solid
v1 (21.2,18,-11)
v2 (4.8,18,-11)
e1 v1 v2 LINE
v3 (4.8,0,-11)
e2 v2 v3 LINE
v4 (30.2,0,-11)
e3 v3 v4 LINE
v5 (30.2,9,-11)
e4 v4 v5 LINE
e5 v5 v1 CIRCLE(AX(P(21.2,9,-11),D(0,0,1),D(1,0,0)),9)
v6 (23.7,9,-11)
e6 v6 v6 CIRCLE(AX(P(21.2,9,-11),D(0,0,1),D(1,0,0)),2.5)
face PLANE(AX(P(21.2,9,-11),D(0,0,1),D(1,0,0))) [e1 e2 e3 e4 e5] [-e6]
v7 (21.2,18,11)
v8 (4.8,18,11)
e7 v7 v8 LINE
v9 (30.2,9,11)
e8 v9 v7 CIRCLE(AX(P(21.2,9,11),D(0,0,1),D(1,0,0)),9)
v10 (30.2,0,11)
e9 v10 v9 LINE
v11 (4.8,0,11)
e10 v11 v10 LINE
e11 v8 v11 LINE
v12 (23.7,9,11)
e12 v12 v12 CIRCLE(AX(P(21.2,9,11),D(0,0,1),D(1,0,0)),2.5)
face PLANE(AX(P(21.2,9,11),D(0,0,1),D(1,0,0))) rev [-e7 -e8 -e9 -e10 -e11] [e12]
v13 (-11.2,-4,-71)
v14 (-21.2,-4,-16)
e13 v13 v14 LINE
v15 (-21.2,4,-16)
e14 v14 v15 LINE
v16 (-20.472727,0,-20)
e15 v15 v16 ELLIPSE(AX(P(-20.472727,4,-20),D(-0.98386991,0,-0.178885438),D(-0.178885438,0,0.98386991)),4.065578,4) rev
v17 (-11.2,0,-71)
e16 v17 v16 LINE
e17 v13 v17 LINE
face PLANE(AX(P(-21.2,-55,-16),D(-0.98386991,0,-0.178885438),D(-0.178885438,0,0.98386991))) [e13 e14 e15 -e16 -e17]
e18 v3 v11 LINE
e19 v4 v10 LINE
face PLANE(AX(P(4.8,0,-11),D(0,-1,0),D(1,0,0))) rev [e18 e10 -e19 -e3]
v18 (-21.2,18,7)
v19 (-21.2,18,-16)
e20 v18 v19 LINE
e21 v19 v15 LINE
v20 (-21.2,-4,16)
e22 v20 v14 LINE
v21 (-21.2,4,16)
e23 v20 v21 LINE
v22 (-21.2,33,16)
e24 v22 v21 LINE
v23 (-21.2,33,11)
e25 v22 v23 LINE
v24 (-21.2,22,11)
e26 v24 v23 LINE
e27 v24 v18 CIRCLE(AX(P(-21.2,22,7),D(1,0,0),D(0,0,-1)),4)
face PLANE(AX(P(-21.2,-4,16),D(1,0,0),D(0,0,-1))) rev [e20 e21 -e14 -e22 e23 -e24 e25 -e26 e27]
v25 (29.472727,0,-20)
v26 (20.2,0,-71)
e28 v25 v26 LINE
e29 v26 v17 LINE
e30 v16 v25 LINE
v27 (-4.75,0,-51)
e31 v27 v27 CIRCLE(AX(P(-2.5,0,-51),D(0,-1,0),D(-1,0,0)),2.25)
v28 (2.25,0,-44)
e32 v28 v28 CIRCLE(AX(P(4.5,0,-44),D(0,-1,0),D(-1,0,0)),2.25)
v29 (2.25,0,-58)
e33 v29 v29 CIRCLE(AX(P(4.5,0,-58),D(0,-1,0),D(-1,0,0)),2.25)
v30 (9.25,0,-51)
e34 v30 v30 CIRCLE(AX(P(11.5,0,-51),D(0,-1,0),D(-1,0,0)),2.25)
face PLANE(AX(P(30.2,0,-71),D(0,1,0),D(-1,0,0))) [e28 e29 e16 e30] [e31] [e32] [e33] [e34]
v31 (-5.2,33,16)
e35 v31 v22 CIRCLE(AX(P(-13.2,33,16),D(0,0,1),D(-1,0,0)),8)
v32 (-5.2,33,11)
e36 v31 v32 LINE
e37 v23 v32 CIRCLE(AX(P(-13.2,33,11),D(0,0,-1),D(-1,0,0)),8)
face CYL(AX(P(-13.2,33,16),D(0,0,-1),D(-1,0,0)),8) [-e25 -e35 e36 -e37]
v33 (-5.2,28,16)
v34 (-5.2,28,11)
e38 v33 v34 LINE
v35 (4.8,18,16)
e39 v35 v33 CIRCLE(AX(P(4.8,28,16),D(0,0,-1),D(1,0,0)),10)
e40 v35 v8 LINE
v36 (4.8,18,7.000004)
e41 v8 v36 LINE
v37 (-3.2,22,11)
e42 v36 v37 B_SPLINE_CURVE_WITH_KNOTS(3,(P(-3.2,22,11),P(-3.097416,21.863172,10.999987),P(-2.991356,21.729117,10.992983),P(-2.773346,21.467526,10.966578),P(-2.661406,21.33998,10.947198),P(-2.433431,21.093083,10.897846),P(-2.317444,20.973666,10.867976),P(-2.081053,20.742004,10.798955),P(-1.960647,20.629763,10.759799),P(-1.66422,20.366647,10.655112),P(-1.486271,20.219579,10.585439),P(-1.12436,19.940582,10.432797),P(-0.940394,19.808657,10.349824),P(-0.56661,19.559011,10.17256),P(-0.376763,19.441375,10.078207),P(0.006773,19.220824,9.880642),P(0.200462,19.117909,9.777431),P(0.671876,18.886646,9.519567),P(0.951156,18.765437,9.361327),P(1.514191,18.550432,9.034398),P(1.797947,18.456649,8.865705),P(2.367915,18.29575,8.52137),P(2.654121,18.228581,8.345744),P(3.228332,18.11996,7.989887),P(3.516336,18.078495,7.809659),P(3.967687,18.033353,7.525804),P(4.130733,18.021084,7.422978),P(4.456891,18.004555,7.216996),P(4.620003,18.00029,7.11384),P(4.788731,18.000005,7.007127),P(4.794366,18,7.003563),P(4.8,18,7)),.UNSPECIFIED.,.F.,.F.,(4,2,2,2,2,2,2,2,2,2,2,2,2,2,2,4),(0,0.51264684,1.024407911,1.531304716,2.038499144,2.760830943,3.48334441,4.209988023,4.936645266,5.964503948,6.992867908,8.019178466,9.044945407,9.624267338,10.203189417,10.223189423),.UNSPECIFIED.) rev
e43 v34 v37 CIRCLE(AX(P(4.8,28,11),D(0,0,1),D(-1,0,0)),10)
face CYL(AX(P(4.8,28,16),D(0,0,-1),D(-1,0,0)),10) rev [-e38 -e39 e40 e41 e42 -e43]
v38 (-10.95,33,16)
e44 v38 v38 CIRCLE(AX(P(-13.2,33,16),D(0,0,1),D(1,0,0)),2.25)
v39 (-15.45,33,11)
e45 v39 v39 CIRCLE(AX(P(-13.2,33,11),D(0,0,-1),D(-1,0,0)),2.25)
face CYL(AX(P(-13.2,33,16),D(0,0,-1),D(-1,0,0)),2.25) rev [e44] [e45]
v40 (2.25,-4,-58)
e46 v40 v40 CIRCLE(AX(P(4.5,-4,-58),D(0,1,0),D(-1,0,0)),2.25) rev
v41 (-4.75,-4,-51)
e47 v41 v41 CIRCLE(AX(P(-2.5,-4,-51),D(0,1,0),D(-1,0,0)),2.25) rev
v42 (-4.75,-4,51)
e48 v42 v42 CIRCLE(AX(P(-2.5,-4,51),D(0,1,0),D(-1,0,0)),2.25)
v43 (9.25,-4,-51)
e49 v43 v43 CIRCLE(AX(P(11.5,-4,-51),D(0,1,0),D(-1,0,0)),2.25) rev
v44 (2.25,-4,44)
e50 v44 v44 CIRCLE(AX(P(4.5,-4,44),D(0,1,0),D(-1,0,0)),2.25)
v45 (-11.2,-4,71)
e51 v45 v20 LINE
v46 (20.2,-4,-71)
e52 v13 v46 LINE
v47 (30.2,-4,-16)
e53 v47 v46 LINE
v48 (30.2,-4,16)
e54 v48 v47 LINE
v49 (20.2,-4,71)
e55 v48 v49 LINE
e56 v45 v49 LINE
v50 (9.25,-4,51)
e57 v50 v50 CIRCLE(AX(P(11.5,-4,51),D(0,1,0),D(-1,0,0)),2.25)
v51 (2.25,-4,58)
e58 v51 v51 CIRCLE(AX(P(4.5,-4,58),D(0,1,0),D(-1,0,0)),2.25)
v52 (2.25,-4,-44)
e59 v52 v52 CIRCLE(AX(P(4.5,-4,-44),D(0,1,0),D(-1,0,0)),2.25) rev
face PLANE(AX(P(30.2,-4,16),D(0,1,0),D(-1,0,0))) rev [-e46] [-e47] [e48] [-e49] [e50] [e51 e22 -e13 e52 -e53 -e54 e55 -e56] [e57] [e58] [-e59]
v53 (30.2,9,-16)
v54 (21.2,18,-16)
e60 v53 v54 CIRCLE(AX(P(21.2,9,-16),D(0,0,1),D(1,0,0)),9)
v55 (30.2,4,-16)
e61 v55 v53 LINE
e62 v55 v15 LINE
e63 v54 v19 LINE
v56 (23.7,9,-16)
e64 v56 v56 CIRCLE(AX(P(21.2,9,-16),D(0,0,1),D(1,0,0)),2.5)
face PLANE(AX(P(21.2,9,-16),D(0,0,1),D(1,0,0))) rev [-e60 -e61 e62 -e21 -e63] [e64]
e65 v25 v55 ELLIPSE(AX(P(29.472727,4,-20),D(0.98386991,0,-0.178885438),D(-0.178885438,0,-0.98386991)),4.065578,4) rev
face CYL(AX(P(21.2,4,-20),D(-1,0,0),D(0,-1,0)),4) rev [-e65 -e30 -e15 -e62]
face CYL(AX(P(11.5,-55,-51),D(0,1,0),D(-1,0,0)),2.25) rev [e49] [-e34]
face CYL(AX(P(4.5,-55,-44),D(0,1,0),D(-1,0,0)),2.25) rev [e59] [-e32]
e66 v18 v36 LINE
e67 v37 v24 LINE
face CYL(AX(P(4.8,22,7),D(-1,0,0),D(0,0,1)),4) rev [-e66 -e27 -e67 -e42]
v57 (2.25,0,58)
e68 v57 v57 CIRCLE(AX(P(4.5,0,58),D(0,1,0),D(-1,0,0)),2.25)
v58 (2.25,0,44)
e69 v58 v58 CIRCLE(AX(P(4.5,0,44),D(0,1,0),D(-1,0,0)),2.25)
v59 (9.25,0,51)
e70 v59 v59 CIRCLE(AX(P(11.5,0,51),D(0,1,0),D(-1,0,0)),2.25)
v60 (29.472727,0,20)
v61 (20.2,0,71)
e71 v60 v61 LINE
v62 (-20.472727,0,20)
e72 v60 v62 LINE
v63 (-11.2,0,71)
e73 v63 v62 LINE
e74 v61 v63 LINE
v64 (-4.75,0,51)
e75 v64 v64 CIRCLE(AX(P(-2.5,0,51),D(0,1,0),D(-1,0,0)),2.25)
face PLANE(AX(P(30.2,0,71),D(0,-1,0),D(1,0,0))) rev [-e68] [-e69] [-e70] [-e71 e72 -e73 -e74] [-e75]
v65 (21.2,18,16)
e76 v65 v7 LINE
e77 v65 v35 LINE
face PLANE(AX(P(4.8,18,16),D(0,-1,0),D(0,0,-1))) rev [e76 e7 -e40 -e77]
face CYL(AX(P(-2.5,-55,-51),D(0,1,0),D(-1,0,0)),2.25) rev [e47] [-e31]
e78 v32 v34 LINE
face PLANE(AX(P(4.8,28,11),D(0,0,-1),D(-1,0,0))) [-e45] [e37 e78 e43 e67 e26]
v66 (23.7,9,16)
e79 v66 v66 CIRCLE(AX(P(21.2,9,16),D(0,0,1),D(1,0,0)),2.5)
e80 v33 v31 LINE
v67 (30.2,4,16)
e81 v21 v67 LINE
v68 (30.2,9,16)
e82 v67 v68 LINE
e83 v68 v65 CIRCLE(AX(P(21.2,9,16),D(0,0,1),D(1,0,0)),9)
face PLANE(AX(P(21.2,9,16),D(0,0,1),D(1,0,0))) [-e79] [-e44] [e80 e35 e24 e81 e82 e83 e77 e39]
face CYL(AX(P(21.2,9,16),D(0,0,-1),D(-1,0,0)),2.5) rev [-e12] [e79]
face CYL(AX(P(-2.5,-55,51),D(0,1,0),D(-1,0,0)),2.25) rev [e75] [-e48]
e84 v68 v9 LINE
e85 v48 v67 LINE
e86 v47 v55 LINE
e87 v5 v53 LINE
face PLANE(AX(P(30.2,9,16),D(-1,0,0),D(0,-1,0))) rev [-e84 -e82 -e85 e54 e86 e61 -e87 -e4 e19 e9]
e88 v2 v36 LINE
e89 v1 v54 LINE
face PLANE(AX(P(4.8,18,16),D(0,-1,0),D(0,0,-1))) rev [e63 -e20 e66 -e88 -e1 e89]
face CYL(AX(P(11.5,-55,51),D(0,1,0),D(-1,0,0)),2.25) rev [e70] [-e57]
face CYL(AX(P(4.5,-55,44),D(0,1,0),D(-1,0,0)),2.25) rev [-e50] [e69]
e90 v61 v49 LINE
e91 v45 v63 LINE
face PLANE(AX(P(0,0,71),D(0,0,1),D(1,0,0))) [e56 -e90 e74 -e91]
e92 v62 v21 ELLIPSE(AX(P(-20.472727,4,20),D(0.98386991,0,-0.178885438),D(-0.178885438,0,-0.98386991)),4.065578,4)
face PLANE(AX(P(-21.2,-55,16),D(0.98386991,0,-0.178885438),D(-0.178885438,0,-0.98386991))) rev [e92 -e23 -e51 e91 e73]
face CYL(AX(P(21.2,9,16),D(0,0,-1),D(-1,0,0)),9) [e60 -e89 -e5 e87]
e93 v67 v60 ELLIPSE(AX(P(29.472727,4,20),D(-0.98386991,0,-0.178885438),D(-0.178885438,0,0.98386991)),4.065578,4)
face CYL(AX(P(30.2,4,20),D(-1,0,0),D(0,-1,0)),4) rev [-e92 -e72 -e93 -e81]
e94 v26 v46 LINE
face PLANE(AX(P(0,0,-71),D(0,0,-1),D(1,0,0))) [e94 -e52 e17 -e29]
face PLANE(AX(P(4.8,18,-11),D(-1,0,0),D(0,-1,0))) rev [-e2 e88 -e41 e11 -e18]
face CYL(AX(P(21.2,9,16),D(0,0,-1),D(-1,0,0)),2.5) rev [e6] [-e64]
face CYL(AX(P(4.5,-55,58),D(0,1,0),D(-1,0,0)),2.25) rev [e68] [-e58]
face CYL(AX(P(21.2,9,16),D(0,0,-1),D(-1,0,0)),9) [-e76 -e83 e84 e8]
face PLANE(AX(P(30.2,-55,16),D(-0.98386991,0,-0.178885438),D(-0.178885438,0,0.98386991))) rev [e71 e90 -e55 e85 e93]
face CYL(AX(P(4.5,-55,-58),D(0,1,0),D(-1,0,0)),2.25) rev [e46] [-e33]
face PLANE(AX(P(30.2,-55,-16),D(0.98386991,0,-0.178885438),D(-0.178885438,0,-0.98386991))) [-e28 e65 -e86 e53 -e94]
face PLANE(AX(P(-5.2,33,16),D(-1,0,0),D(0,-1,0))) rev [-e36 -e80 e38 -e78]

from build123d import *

# Parameters (mm, degrees)
SKETCH1_R           = 2.5
SKETCH1_R_2         = 2.25
BOSS_EXTRUDE1_DEPTH = 16
SKETCH_2_W          = 51.4
SKETCH_2_H          = 4
EXTRUDE_1_DEPTH     = 55
SKETCH_3_R          = 2.25
CUT_EXTRUDE_2_DEPTH = 55
CUT_EXTRUDE_3_DEPTH = 11
CUT_EXTRUDE_START   = -27
CUT_EXTRUDE_4_DEPTH = 27
FILLET_1_R          = 4


with BuildPart() as part:
    # Sketch1 → Boss-Extrude1 (new, symmetric)
    with BuildSketch(Plane.XY):
        with BuildLine():
            Line((-21.2, 33), (-21.2, 22))
            Line((-21.2, 22), (-21.2, 0))
            Line((-21.2, 0), (-21.2, -4))
            Line((-21.2, -4), (30.2, -4))
            Line((30.2, -4), (30.2, 9))
            ThreePointArc((30.2, 9), (27.563961031, 15.363961031), (21.2, 18))
            Line((21.2, 18), (4.8, 18))
            ThreePointArc((4.8, 18), (-2.271067812, 20.928932188), (-5.2, 28))
            Line((-5.2, 28), (-5.2, 33))
            ThreePointArc((-5.2, 33), (-13.2, 41), (-21.2, 33))
        make_face()
        with Locations((21.2, 9)):
            Circle(SKETCH1_R, mode=Mode.SUBTRACT)
        with Locations((-13.2, 33)):
            Circle(SKETCH1_R_2, mode=Mode.SUBTRACT)
    extrude(amount=BOSS_EXTRUDE1_DEPTH, both=True)

    # 草图2 → 凸台-拉伸1 (add)
    with BuildSketch(Plane.XY.offset(16)):
        with Locations((4.5, -2)):
            Rectangle(SKETCH_2_W, SKETCH_2_H)
    extrude_1 = extrude(amount=EXTRUDE_1_DEPTH)

    # 草图3 → 切除-拉伸2 (cut)
    with BuildSketch(Plane(origin=(0, 0, 0), x_dir=(1, 0, 0), z_dir=(0, 1, 0))):
        with Locations(Location((11.5, -51, 0), (0, 0, 180))):
            Circle(SKETCH_3_R)
        with Locations(Location((4.5, -44, 0), (0, 0, 180))):
            Circle(SKETCH_3_R)
        with Locations(Location((4.5, -58, 0), (0, 0, 180))):
            Circle(SKETCH_3_R)
        with Locations(Location((-2.5, -51, 0), (0, 0, 180))):
            Circle(SKETCH_3_R)
        Polygon((30.2, -16), (20.2, -71), (30.2, -71), align=None)
        Polygon((-21.2, -16), (-11.2, -71), (-21.2, -71), align=None)
    cut_extrude_2 = extrude(amount=-CUT_EXTRUDE_2_DEPTH, mode=Mode.SUBTRACT)

    # 镜向1: 凸台-拉伸1, 切除-拉伸2 across plane
    add(extrude_1.mirror(Plane.XY))
    add(cut_extrude_2.mirror(Plane.XY), mode=Mode.SUBTRACT)

    # 草图6 → 切除-拉伸3 (cut, symmetric)
    with BuildSketch(Plane.XY):
        with BuildLine():
            Line((4.8, 18), (4.8, 0))
            Line((4.8, 0), (30.2, 0))
            Line((30.2, 0), (30.2, 9))
            ThreePointArc((30.2, 9), (27.563961031, 15.363961031), (21.2, 18))
            Line((21.2, 18), (4.8, 18))
        make_face()
    extrude(amount=CUT_EXTRUDE_3_DEPTH, both=True, mode=Mode.SUBTRACT)

    # 草图7 → 切除-拉伸4 (cut)
    with BuildSketch(Plane(origin=(0, 0, -16), x_dir=(-1, 0, 0), z_dir=(0, 0, -1)).offset(CUT_EXTRUDE_START)):
        with BuildLine():
            Line((-4.8, 18), (21.2, 18))
            Line((21.2, 18), (21.2, 33))
            ThreePointArc((21.2, 33), (13.2, 41), (5.2, 33))
            Line((5.2, 33), (5.2, 28))
            ThreePointArc((5.2, 28), (2.271067812, 20.928932188), (-4.8, 18))
        make_face()
    extrude(amount=CUT_EXTRUDE_4_DEPTH, mode=Mode.SUBTRACT)

    # 圆角1
    # the kernel refuses this fillet: 4 mm, written as the material it adds along each edge
    with BuildSketch(Plane(origin=(-31.2, 0, -16), x_dir=(0, 1, 0), z_dir=(1, 0, 0))) as fillet_1_piece_1_section:
        with BuildLine():
            CenterArc((FILLET_1_R, -FILLET_1_R), FILLET_1_R, 90, 90)
            Line((0, -FILLET_1_R), (0, 0))
            Line((0, 0), (FILLET_1_R, 0))
        make_face()
    fillet_1_piece_1 = extrude(amount=71.4, mode=Mode.PRIVATE)
    fillet_1_piece_1 = split(fillet_1_piece_1, bisect_by=Plane(origin=(-20.221053864, 0.89582788, -21.384203748), z_dir=(0.9838699100999075, 0, 0.178885438199983)), keep=Keep.TOP, mode=Mode.PRIVATE)
    fillet_1_piece_1 = split(fillet_1_piece_1, bisect_by=Plane(origin=(29.221053864, 0.89582788, -21.384203748), z_dir=(-0.9838699100999075, 0, 0.1788854381999831)), keep=Keep.TOP, mode=Mode.PRIVATE)
    add(fillet_1_piece_1)
    with BuildSketch(Plane(origin=(4.8, 18, 11), x_dir=(0, 1, 0), z_dir=(-1, 0, 0))) as fillet_1_piece_2_section:
        with BuildLine():
            CenterArc((FILLET_1_R, FILLET_1_R), FILLET_1_R, 180, 90)
            Line((0, FILLET_1_R), (0, 0))
            Line((0, 0), (FILLET_1_R, 0))
        make_face()
    fillet_1_piece_2 = extrude(amount=26, mode=Mode.PRIVATE)
    fillet_1_piece_2 = fillet_1_piece_2 - Plane(origin=(4.8, 28, 10.070813785), x_dir=(0, -1, 0), z_dir=(0, 0, 1)) * Cylinder(10, 68, mode=Mode.PRIVATE)
    add(fillet_1_piece_2)
    with BuildSketch(Plane(origin=(-31.2, 0, 16), x_dir=(0, 0, 1), z_dir=(1, 0, 0))) as fillet_1_piece_3_section:
        with BuildLine():
            CenterArc((FILLET_1_R, -FILLET_1_R), FILLET_1_R, 90, 90)
            Line((0, -FILLET_1_R), (0, 0))
            Line((0, 0), (FILLET_1_R, 0))
        make_face()
    fillet_1_piece_3 = extrude(amount=71.4, mode=Mode.PRIVATE)
    fillet_1_piece_3 = split(fillet_1_piece_3, bisect_by=Plane(origin=(29.221053864, 0.89582788, 21.384203748), z_dir=(-0.9838699100999075, 0, -0.1788854381999831)), keep=Keep.TOP, mode=Mode.PRIVATE)
    fillet_1_piece_3 = split(fillet_1_piece_3, bisect_by=Plane(origin=(-20.221053864, 0.89582788, 21.384203748), z_dir=(0.9838699100999075, 0, -0.178885438199983)), keep=Keep.TOP, mode=Mode.PRIVATE)
    add(fillet_1_piece_3)


solid = part.part
